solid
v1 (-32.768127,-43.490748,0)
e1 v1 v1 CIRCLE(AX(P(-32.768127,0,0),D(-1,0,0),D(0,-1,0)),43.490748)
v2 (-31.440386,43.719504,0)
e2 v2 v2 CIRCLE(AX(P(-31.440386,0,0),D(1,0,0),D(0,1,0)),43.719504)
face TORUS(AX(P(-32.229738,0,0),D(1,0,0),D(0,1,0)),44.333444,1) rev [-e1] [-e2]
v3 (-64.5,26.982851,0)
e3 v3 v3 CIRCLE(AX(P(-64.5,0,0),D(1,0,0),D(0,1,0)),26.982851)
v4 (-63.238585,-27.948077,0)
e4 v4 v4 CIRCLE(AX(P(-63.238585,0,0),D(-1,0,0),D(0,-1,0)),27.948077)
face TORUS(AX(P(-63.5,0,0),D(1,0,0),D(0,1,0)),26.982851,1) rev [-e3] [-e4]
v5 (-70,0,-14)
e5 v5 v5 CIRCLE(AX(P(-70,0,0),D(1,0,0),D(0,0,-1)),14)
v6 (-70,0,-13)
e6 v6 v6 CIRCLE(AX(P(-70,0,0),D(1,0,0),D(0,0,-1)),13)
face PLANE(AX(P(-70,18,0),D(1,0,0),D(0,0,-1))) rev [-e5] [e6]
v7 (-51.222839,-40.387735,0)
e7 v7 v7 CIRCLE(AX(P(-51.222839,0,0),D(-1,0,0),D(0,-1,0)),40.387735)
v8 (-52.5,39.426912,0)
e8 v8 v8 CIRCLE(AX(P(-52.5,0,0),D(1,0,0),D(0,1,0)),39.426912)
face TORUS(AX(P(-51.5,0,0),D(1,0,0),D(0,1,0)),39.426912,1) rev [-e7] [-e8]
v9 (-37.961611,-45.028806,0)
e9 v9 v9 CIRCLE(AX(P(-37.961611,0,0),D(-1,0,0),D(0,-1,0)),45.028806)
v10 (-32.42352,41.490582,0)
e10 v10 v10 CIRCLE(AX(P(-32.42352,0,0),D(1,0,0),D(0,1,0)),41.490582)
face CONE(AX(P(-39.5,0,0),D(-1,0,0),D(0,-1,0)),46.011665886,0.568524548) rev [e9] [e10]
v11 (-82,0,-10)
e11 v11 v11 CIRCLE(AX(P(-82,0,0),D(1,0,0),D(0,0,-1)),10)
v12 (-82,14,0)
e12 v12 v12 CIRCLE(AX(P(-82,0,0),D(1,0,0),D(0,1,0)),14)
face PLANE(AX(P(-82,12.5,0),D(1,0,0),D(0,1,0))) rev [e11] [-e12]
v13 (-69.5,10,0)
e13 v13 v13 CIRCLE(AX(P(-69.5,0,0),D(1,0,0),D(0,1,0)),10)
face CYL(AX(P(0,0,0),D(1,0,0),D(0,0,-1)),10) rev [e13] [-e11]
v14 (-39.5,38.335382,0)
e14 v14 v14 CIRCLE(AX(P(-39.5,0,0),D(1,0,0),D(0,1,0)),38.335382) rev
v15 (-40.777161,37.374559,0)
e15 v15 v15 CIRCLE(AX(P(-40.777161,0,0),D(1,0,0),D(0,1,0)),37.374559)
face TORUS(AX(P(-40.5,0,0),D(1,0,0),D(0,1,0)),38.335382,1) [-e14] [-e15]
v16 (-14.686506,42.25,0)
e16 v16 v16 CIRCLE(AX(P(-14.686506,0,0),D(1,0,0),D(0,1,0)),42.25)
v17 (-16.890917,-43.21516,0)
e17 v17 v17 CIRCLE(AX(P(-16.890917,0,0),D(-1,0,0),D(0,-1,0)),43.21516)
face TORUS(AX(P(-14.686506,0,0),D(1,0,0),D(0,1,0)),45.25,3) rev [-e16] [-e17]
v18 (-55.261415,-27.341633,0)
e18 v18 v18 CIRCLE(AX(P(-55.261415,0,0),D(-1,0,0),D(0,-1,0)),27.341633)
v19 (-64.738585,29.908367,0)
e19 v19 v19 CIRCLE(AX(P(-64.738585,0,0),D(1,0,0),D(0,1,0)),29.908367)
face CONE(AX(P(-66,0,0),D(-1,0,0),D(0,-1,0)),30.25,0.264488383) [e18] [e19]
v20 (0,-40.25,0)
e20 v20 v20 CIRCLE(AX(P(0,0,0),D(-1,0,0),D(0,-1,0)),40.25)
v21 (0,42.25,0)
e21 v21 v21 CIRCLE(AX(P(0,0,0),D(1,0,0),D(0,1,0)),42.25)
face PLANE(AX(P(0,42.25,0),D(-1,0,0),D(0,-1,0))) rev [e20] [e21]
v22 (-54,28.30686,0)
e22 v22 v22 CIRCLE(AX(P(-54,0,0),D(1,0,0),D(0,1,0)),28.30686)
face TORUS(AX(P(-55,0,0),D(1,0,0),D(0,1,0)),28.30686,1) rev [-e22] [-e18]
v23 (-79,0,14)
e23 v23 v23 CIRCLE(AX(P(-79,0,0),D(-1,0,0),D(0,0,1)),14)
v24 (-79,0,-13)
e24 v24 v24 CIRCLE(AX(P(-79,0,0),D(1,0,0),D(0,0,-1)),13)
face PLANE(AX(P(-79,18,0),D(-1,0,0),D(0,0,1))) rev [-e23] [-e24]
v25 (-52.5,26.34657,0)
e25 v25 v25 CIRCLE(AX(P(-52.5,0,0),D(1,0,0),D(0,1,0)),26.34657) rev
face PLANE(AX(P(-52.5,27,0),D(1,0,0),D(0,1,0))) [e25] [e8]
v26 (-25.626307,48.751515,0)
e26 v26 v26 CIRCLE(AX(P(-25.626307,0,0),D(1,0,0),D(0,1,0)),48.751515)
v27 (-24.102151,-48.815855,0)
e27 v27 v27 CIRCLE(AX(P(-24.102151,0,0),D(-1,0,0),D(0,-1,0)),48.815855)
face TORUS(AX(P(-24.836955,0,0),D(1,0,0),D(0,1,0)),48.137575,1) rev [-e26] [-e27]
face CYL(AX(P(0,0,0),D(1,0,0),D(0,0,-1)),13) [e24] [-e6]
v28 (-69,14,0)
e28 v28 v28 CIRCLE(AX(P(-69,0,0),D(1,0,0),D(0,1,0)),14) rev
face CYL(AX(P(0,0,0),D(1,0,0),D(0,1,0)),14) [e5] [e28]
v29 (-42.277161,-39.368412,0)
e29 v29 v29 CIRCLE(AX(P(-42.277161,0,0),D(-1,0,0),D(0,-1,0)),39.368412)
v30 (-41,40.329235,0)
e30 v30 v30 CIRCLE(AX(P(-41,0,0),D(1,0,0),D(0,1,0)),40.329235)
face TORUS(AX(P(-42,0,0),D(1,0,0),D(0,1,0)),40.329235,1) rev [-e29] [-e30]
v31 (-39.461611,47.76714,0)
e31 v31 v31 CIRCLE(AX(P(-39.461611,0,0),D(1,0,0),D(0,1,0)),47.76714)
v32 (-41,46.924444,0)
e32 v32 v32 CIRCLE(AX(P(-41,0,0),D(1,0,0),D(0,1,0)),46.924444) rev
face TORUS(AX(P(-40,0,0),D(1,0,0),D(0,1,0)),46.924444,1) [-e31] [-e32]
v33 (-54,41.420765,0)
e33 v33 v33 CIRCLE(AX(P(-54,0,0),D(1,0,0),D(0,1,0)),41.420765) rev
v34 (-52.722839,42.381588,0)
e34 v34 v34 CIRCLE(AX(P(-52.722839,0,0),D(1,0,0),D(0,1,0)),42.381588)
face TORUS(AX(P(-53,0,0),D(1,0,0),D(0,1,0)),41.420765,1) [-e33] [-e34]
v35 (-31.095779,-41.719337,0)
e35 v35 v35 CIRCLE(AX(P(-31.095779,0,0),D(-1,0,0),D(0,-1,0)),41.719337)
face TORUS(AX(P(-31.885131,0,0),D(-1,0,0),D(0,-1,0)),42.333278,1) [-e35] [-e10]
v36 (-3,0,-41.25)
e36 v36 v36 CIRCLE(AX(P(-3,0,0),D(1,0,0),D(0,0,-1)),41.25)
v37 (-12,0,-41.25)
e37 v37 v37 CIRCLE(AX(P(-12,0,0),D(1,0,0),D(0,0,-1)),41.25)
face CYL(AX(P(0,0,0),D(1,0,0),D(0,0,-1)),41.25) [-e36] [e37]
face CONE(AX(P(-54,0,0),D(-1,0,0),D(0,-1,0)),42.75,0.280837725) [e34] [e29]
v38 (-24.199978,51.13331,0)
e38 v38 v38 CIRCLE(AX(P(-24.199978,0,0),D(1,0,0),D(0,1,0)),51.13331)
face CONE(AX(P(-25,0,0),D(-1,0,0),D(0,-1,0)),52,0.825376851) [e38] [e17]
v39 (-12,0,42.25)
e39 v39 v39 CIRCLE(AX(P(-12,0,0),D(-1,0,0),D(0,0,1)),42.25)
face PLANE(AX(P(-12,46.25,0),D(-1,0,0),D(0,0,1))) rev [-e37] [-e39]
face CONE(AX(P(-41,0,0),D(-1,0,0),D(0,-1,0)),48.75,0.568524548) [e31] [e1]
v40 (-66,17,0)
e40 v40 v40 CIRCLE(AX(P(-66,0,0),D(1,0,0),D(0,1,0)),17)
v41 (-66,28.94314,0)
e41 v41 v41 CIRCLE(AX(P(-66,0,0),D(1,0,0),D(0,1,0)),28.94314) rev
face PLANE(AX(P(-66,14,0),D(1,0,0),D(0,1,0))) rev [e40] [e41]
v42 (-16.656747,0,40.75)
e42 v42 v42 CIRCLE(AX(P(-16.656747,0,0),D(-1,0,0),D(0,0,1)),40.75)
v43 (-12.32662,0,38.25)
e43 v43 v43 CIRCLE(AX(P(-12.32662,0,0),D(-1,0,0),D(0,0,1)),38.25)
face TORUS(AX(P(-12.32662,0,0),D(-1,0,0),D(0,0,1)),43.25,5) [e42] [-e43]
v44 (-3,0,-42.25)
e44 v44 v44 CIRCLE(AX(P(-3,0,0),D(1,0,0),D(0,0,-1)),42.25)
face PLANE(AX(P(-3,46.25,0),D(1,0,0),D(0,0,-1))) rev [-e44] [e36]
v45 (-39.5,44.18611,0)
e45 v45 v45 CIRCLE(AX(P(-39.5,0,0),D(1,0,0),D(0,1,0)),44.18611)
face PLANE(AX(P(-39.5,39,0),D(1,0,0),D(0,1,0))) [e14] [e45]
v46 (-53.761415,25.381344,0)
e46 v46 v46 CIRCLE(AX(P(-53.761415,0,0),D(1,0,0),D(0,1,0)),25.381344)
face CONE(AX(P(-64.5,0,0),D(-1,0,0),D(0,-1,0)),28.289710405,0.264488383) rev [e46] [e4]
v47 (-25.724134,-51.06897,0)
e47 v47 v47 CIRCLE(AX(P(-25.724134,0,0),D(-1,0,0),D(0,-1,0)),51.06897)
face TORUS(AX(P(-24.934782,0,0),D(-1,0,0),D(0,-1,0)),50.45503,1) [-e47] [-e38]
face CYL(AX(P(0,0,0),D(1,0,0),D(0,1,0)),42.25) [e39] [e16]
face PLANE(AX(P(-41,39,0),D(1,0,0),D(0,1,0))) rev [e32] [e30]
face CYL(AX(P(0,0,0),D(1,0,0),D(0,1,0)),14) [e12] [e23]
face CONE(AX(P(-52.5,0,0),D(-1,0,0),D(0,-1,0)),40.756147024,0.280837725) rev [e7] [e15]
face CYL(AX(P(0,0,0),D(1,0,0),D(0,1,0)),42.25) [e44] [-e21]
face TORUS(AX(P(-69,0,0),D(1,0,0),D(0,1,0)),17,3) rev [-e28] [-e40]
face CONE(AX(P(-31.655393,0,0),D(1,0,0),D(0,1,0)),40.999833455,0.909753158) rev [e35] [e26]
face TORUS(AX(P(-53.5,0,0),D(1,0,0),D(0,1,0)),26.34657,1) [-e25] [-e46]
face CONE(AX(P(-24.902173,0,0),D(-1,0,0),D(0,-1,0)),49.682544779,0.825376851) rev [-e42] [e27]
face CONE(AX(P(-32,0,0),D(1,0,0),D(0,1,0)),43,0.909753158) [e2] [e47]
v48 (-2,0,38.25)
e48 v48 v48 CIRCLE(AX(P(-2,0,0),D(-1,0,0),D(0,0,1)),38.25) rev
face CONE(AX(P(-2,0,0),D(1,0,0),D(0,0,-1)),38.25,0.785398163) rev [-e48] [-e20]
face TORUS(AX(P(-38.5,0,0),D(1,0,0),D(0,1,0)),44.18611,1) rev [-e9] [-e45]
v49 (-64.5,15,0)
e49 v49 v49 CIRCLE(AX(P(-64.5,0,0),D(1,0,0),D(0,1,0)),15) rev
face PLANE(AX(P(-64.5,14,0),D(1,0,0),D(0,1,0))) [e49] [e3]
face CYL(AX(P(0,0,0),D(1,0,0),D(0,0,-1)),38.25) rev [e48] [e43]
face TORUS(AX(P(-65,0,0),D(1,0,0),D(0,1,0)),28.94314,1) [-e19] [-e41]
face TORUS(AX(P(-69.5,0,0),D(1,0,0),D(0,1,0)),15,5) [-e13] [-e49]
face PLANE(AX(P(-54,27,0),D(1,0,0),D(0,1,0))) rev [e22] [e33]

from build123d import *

# Parameters (mm, degrees)
SKETCH_3_W     = 17.5
SKETCH_3_H     = 3
SKETCH_3_W_2   = 16.656746848
CHAMFER_1_SIZE = 2
SKETCH_4_W     = 9
SKETCH_4_H     = 5
FILLET_1_R     = 1
FILLET_2_R     = 3
FILLET_3_R     = 5


with BuildPart() as part:
    # Эскиз1 → Revolve 1 (revolve)
    with BuildSketch(Plane.XY):
        Polygon((-82, 14), (-66, 14), (-66, 30.25), (-54, 27), (-54, 42.75), (-41, 39), (-41, 48.75), (-32, 43), (-25, 52), (-16, 42.25), (0, 42.25), (0, 40.75), (-16.656746848, 40.75), (-24.902172797, 49.682544779), (-31.655392716, 40.999833455), (-39.5, 46.011665886), (-39.5, 37.006147024), (-52.5, 40.756147024), (-52.5, 25.039710405), (-64.5, 28.289710405), (-64.5, 12.5), (-82, 12.5), align=None)
    revolve(axis=Axis((0, 0, 0), (-1, 0, 0)))

    # Эскиз3 → Revolve 1 2 (revolve)
    with BuildSketch(Plane.XY, mode=Mode.PRIVATE) as revolve_1_2_sk:
        with Locations((-73.25, 11.5)):
            Rectangle(SKETCH_3_W, SKETCH_3_H)
        with Locations((-8.328373424, 39.75)):
            Rectangle(SKETCH_3_W_2, SKETCH_3_H)
    revolve(revolve_1_2_sk.sketch.rotate(Axis((0, 0, 0), (-1, 0, 0)), 90), axis=Axis((0, 0, 0), (-1, 0, 0)))

    # Фаска1
    chamfer_1_edges = [part.edges().sort_by_distance(p)[0] for p in [
        (0, 0, 38.25),
    ]]
    chamfer(chamfer_1_edges, length=CHAMFER_1_SIZE)

    # Эскиз4 → Вырез-Повернуть1 (revolve, cut)
    with BuildSketch(Plane.XY):
        with Locations((-74.5, 15.5)):
            Rectangle(SKETCH_4_W, SKETCH_4_H)
        with Locations((-7.5, 43.75)):
            Rectangle(SKETCH_4_W, SKETCH_4_H)
    revolve(axis=Axis((0, 0, 0), (-1, 0, 0)), mode=Mode.SUBTRACT)

    # Скругление1
    fillet_1_edges = [part.edges().sort_by_distance(p)[0] for p in [
        (-25, -52, 0),
        (-32, -43, 0),
        (-41, -48.75, 0),
        (-41, -39, 0),
        (-54, -42.75, 0),
        (-54, -27, 0),
        (-66, -30.25, 0),
        (-64.5, -28.289710405, 0),
        (-52.5, -25.039710405, 0),
        (-52.5, -40.756147024, 0),
        (-39.5, -37.006147024, 0),
        (-39.5, -46.011665886, 0),
        (-31.655392716, -40.999833455, 0),
        (-24.902172797, -49.682544779, 0),
    ]]
    fillet(fillet_1_edges, radius=FILLET_1_R)

    # Скругление2
    fillet_2_edges = [part.edges().sort_by_distance(p)[0] for p in [
        (-16, -42.25, 0),
        (-66, -14, 0),
    ]]
    fillet(fillet_2_edges, radius=FILLET_2_R)

    # Скругление3
    # the kernel refuses this fillet: 5 mm, written as the material it takes off along each edge
    with BuildSketch(Plane(origin=(-64.5, 0, 0), x_dir=(0, 0, -1), z_dir=(0, 1, 0))) as fillet_3_piece_1:
        with BuildLine():
            CenterArc((10 + FILLET_3_R, FILLET_3_R), FILLET_3_R, 180, 90)
            Line((10, FILLET_3_R), (10 - FILLET_3_R * 0.02, FILLET_3_R))
            Line((10 - FILLET_3_R * 0.02, FILLET_3_R), (10 - FILLET_3_R * 0.02, -FILLET_3_R * 0.02))
            Line((10 - FILLET_3_R * 0.02, -FILLET_3_R * 0.02), (10 + FILLET_3_R, -FILLET_3_R * 0.02))
            Line((10 + FILLET_3_R, -FILLET_3_R * 0.02), (10 + FILLET_3_R, 0))
        make_face()
    revolve(axis=Axis((-64.5, 0, 0), (-1, 0, 0)), mode=Mode.SUBTRACT)
    with BuildSketch(Plane(origin=(-16.656746848, 0, 0), x_dir=(0, 0, -1), z_dir=(0, 1, 0))) as fillet_3_piece_2:
        with BuildLine():
            CenterArc((43.25, -4.330127019), FILLET_3_R, 120, 60)
            Line((40.75, 0), (40.7, 0.08660254))
            ThreePointArc((40.7, 0.08660254), (39.5, 0.1), (38.25, 0.1))
            Line((38.25, 0.1), (38.15, 0))
            Line((38.15, 0), (38.15, -4.330127019))
            Line((38.15, -4.330127019), (38.25, -4.330127019))
        make_face()
    revolve(axis=Axis((-16.656746848, 0, 0), (-1, 0, 0)), mode=Mode.SUBTRACT)


solid = part.part
